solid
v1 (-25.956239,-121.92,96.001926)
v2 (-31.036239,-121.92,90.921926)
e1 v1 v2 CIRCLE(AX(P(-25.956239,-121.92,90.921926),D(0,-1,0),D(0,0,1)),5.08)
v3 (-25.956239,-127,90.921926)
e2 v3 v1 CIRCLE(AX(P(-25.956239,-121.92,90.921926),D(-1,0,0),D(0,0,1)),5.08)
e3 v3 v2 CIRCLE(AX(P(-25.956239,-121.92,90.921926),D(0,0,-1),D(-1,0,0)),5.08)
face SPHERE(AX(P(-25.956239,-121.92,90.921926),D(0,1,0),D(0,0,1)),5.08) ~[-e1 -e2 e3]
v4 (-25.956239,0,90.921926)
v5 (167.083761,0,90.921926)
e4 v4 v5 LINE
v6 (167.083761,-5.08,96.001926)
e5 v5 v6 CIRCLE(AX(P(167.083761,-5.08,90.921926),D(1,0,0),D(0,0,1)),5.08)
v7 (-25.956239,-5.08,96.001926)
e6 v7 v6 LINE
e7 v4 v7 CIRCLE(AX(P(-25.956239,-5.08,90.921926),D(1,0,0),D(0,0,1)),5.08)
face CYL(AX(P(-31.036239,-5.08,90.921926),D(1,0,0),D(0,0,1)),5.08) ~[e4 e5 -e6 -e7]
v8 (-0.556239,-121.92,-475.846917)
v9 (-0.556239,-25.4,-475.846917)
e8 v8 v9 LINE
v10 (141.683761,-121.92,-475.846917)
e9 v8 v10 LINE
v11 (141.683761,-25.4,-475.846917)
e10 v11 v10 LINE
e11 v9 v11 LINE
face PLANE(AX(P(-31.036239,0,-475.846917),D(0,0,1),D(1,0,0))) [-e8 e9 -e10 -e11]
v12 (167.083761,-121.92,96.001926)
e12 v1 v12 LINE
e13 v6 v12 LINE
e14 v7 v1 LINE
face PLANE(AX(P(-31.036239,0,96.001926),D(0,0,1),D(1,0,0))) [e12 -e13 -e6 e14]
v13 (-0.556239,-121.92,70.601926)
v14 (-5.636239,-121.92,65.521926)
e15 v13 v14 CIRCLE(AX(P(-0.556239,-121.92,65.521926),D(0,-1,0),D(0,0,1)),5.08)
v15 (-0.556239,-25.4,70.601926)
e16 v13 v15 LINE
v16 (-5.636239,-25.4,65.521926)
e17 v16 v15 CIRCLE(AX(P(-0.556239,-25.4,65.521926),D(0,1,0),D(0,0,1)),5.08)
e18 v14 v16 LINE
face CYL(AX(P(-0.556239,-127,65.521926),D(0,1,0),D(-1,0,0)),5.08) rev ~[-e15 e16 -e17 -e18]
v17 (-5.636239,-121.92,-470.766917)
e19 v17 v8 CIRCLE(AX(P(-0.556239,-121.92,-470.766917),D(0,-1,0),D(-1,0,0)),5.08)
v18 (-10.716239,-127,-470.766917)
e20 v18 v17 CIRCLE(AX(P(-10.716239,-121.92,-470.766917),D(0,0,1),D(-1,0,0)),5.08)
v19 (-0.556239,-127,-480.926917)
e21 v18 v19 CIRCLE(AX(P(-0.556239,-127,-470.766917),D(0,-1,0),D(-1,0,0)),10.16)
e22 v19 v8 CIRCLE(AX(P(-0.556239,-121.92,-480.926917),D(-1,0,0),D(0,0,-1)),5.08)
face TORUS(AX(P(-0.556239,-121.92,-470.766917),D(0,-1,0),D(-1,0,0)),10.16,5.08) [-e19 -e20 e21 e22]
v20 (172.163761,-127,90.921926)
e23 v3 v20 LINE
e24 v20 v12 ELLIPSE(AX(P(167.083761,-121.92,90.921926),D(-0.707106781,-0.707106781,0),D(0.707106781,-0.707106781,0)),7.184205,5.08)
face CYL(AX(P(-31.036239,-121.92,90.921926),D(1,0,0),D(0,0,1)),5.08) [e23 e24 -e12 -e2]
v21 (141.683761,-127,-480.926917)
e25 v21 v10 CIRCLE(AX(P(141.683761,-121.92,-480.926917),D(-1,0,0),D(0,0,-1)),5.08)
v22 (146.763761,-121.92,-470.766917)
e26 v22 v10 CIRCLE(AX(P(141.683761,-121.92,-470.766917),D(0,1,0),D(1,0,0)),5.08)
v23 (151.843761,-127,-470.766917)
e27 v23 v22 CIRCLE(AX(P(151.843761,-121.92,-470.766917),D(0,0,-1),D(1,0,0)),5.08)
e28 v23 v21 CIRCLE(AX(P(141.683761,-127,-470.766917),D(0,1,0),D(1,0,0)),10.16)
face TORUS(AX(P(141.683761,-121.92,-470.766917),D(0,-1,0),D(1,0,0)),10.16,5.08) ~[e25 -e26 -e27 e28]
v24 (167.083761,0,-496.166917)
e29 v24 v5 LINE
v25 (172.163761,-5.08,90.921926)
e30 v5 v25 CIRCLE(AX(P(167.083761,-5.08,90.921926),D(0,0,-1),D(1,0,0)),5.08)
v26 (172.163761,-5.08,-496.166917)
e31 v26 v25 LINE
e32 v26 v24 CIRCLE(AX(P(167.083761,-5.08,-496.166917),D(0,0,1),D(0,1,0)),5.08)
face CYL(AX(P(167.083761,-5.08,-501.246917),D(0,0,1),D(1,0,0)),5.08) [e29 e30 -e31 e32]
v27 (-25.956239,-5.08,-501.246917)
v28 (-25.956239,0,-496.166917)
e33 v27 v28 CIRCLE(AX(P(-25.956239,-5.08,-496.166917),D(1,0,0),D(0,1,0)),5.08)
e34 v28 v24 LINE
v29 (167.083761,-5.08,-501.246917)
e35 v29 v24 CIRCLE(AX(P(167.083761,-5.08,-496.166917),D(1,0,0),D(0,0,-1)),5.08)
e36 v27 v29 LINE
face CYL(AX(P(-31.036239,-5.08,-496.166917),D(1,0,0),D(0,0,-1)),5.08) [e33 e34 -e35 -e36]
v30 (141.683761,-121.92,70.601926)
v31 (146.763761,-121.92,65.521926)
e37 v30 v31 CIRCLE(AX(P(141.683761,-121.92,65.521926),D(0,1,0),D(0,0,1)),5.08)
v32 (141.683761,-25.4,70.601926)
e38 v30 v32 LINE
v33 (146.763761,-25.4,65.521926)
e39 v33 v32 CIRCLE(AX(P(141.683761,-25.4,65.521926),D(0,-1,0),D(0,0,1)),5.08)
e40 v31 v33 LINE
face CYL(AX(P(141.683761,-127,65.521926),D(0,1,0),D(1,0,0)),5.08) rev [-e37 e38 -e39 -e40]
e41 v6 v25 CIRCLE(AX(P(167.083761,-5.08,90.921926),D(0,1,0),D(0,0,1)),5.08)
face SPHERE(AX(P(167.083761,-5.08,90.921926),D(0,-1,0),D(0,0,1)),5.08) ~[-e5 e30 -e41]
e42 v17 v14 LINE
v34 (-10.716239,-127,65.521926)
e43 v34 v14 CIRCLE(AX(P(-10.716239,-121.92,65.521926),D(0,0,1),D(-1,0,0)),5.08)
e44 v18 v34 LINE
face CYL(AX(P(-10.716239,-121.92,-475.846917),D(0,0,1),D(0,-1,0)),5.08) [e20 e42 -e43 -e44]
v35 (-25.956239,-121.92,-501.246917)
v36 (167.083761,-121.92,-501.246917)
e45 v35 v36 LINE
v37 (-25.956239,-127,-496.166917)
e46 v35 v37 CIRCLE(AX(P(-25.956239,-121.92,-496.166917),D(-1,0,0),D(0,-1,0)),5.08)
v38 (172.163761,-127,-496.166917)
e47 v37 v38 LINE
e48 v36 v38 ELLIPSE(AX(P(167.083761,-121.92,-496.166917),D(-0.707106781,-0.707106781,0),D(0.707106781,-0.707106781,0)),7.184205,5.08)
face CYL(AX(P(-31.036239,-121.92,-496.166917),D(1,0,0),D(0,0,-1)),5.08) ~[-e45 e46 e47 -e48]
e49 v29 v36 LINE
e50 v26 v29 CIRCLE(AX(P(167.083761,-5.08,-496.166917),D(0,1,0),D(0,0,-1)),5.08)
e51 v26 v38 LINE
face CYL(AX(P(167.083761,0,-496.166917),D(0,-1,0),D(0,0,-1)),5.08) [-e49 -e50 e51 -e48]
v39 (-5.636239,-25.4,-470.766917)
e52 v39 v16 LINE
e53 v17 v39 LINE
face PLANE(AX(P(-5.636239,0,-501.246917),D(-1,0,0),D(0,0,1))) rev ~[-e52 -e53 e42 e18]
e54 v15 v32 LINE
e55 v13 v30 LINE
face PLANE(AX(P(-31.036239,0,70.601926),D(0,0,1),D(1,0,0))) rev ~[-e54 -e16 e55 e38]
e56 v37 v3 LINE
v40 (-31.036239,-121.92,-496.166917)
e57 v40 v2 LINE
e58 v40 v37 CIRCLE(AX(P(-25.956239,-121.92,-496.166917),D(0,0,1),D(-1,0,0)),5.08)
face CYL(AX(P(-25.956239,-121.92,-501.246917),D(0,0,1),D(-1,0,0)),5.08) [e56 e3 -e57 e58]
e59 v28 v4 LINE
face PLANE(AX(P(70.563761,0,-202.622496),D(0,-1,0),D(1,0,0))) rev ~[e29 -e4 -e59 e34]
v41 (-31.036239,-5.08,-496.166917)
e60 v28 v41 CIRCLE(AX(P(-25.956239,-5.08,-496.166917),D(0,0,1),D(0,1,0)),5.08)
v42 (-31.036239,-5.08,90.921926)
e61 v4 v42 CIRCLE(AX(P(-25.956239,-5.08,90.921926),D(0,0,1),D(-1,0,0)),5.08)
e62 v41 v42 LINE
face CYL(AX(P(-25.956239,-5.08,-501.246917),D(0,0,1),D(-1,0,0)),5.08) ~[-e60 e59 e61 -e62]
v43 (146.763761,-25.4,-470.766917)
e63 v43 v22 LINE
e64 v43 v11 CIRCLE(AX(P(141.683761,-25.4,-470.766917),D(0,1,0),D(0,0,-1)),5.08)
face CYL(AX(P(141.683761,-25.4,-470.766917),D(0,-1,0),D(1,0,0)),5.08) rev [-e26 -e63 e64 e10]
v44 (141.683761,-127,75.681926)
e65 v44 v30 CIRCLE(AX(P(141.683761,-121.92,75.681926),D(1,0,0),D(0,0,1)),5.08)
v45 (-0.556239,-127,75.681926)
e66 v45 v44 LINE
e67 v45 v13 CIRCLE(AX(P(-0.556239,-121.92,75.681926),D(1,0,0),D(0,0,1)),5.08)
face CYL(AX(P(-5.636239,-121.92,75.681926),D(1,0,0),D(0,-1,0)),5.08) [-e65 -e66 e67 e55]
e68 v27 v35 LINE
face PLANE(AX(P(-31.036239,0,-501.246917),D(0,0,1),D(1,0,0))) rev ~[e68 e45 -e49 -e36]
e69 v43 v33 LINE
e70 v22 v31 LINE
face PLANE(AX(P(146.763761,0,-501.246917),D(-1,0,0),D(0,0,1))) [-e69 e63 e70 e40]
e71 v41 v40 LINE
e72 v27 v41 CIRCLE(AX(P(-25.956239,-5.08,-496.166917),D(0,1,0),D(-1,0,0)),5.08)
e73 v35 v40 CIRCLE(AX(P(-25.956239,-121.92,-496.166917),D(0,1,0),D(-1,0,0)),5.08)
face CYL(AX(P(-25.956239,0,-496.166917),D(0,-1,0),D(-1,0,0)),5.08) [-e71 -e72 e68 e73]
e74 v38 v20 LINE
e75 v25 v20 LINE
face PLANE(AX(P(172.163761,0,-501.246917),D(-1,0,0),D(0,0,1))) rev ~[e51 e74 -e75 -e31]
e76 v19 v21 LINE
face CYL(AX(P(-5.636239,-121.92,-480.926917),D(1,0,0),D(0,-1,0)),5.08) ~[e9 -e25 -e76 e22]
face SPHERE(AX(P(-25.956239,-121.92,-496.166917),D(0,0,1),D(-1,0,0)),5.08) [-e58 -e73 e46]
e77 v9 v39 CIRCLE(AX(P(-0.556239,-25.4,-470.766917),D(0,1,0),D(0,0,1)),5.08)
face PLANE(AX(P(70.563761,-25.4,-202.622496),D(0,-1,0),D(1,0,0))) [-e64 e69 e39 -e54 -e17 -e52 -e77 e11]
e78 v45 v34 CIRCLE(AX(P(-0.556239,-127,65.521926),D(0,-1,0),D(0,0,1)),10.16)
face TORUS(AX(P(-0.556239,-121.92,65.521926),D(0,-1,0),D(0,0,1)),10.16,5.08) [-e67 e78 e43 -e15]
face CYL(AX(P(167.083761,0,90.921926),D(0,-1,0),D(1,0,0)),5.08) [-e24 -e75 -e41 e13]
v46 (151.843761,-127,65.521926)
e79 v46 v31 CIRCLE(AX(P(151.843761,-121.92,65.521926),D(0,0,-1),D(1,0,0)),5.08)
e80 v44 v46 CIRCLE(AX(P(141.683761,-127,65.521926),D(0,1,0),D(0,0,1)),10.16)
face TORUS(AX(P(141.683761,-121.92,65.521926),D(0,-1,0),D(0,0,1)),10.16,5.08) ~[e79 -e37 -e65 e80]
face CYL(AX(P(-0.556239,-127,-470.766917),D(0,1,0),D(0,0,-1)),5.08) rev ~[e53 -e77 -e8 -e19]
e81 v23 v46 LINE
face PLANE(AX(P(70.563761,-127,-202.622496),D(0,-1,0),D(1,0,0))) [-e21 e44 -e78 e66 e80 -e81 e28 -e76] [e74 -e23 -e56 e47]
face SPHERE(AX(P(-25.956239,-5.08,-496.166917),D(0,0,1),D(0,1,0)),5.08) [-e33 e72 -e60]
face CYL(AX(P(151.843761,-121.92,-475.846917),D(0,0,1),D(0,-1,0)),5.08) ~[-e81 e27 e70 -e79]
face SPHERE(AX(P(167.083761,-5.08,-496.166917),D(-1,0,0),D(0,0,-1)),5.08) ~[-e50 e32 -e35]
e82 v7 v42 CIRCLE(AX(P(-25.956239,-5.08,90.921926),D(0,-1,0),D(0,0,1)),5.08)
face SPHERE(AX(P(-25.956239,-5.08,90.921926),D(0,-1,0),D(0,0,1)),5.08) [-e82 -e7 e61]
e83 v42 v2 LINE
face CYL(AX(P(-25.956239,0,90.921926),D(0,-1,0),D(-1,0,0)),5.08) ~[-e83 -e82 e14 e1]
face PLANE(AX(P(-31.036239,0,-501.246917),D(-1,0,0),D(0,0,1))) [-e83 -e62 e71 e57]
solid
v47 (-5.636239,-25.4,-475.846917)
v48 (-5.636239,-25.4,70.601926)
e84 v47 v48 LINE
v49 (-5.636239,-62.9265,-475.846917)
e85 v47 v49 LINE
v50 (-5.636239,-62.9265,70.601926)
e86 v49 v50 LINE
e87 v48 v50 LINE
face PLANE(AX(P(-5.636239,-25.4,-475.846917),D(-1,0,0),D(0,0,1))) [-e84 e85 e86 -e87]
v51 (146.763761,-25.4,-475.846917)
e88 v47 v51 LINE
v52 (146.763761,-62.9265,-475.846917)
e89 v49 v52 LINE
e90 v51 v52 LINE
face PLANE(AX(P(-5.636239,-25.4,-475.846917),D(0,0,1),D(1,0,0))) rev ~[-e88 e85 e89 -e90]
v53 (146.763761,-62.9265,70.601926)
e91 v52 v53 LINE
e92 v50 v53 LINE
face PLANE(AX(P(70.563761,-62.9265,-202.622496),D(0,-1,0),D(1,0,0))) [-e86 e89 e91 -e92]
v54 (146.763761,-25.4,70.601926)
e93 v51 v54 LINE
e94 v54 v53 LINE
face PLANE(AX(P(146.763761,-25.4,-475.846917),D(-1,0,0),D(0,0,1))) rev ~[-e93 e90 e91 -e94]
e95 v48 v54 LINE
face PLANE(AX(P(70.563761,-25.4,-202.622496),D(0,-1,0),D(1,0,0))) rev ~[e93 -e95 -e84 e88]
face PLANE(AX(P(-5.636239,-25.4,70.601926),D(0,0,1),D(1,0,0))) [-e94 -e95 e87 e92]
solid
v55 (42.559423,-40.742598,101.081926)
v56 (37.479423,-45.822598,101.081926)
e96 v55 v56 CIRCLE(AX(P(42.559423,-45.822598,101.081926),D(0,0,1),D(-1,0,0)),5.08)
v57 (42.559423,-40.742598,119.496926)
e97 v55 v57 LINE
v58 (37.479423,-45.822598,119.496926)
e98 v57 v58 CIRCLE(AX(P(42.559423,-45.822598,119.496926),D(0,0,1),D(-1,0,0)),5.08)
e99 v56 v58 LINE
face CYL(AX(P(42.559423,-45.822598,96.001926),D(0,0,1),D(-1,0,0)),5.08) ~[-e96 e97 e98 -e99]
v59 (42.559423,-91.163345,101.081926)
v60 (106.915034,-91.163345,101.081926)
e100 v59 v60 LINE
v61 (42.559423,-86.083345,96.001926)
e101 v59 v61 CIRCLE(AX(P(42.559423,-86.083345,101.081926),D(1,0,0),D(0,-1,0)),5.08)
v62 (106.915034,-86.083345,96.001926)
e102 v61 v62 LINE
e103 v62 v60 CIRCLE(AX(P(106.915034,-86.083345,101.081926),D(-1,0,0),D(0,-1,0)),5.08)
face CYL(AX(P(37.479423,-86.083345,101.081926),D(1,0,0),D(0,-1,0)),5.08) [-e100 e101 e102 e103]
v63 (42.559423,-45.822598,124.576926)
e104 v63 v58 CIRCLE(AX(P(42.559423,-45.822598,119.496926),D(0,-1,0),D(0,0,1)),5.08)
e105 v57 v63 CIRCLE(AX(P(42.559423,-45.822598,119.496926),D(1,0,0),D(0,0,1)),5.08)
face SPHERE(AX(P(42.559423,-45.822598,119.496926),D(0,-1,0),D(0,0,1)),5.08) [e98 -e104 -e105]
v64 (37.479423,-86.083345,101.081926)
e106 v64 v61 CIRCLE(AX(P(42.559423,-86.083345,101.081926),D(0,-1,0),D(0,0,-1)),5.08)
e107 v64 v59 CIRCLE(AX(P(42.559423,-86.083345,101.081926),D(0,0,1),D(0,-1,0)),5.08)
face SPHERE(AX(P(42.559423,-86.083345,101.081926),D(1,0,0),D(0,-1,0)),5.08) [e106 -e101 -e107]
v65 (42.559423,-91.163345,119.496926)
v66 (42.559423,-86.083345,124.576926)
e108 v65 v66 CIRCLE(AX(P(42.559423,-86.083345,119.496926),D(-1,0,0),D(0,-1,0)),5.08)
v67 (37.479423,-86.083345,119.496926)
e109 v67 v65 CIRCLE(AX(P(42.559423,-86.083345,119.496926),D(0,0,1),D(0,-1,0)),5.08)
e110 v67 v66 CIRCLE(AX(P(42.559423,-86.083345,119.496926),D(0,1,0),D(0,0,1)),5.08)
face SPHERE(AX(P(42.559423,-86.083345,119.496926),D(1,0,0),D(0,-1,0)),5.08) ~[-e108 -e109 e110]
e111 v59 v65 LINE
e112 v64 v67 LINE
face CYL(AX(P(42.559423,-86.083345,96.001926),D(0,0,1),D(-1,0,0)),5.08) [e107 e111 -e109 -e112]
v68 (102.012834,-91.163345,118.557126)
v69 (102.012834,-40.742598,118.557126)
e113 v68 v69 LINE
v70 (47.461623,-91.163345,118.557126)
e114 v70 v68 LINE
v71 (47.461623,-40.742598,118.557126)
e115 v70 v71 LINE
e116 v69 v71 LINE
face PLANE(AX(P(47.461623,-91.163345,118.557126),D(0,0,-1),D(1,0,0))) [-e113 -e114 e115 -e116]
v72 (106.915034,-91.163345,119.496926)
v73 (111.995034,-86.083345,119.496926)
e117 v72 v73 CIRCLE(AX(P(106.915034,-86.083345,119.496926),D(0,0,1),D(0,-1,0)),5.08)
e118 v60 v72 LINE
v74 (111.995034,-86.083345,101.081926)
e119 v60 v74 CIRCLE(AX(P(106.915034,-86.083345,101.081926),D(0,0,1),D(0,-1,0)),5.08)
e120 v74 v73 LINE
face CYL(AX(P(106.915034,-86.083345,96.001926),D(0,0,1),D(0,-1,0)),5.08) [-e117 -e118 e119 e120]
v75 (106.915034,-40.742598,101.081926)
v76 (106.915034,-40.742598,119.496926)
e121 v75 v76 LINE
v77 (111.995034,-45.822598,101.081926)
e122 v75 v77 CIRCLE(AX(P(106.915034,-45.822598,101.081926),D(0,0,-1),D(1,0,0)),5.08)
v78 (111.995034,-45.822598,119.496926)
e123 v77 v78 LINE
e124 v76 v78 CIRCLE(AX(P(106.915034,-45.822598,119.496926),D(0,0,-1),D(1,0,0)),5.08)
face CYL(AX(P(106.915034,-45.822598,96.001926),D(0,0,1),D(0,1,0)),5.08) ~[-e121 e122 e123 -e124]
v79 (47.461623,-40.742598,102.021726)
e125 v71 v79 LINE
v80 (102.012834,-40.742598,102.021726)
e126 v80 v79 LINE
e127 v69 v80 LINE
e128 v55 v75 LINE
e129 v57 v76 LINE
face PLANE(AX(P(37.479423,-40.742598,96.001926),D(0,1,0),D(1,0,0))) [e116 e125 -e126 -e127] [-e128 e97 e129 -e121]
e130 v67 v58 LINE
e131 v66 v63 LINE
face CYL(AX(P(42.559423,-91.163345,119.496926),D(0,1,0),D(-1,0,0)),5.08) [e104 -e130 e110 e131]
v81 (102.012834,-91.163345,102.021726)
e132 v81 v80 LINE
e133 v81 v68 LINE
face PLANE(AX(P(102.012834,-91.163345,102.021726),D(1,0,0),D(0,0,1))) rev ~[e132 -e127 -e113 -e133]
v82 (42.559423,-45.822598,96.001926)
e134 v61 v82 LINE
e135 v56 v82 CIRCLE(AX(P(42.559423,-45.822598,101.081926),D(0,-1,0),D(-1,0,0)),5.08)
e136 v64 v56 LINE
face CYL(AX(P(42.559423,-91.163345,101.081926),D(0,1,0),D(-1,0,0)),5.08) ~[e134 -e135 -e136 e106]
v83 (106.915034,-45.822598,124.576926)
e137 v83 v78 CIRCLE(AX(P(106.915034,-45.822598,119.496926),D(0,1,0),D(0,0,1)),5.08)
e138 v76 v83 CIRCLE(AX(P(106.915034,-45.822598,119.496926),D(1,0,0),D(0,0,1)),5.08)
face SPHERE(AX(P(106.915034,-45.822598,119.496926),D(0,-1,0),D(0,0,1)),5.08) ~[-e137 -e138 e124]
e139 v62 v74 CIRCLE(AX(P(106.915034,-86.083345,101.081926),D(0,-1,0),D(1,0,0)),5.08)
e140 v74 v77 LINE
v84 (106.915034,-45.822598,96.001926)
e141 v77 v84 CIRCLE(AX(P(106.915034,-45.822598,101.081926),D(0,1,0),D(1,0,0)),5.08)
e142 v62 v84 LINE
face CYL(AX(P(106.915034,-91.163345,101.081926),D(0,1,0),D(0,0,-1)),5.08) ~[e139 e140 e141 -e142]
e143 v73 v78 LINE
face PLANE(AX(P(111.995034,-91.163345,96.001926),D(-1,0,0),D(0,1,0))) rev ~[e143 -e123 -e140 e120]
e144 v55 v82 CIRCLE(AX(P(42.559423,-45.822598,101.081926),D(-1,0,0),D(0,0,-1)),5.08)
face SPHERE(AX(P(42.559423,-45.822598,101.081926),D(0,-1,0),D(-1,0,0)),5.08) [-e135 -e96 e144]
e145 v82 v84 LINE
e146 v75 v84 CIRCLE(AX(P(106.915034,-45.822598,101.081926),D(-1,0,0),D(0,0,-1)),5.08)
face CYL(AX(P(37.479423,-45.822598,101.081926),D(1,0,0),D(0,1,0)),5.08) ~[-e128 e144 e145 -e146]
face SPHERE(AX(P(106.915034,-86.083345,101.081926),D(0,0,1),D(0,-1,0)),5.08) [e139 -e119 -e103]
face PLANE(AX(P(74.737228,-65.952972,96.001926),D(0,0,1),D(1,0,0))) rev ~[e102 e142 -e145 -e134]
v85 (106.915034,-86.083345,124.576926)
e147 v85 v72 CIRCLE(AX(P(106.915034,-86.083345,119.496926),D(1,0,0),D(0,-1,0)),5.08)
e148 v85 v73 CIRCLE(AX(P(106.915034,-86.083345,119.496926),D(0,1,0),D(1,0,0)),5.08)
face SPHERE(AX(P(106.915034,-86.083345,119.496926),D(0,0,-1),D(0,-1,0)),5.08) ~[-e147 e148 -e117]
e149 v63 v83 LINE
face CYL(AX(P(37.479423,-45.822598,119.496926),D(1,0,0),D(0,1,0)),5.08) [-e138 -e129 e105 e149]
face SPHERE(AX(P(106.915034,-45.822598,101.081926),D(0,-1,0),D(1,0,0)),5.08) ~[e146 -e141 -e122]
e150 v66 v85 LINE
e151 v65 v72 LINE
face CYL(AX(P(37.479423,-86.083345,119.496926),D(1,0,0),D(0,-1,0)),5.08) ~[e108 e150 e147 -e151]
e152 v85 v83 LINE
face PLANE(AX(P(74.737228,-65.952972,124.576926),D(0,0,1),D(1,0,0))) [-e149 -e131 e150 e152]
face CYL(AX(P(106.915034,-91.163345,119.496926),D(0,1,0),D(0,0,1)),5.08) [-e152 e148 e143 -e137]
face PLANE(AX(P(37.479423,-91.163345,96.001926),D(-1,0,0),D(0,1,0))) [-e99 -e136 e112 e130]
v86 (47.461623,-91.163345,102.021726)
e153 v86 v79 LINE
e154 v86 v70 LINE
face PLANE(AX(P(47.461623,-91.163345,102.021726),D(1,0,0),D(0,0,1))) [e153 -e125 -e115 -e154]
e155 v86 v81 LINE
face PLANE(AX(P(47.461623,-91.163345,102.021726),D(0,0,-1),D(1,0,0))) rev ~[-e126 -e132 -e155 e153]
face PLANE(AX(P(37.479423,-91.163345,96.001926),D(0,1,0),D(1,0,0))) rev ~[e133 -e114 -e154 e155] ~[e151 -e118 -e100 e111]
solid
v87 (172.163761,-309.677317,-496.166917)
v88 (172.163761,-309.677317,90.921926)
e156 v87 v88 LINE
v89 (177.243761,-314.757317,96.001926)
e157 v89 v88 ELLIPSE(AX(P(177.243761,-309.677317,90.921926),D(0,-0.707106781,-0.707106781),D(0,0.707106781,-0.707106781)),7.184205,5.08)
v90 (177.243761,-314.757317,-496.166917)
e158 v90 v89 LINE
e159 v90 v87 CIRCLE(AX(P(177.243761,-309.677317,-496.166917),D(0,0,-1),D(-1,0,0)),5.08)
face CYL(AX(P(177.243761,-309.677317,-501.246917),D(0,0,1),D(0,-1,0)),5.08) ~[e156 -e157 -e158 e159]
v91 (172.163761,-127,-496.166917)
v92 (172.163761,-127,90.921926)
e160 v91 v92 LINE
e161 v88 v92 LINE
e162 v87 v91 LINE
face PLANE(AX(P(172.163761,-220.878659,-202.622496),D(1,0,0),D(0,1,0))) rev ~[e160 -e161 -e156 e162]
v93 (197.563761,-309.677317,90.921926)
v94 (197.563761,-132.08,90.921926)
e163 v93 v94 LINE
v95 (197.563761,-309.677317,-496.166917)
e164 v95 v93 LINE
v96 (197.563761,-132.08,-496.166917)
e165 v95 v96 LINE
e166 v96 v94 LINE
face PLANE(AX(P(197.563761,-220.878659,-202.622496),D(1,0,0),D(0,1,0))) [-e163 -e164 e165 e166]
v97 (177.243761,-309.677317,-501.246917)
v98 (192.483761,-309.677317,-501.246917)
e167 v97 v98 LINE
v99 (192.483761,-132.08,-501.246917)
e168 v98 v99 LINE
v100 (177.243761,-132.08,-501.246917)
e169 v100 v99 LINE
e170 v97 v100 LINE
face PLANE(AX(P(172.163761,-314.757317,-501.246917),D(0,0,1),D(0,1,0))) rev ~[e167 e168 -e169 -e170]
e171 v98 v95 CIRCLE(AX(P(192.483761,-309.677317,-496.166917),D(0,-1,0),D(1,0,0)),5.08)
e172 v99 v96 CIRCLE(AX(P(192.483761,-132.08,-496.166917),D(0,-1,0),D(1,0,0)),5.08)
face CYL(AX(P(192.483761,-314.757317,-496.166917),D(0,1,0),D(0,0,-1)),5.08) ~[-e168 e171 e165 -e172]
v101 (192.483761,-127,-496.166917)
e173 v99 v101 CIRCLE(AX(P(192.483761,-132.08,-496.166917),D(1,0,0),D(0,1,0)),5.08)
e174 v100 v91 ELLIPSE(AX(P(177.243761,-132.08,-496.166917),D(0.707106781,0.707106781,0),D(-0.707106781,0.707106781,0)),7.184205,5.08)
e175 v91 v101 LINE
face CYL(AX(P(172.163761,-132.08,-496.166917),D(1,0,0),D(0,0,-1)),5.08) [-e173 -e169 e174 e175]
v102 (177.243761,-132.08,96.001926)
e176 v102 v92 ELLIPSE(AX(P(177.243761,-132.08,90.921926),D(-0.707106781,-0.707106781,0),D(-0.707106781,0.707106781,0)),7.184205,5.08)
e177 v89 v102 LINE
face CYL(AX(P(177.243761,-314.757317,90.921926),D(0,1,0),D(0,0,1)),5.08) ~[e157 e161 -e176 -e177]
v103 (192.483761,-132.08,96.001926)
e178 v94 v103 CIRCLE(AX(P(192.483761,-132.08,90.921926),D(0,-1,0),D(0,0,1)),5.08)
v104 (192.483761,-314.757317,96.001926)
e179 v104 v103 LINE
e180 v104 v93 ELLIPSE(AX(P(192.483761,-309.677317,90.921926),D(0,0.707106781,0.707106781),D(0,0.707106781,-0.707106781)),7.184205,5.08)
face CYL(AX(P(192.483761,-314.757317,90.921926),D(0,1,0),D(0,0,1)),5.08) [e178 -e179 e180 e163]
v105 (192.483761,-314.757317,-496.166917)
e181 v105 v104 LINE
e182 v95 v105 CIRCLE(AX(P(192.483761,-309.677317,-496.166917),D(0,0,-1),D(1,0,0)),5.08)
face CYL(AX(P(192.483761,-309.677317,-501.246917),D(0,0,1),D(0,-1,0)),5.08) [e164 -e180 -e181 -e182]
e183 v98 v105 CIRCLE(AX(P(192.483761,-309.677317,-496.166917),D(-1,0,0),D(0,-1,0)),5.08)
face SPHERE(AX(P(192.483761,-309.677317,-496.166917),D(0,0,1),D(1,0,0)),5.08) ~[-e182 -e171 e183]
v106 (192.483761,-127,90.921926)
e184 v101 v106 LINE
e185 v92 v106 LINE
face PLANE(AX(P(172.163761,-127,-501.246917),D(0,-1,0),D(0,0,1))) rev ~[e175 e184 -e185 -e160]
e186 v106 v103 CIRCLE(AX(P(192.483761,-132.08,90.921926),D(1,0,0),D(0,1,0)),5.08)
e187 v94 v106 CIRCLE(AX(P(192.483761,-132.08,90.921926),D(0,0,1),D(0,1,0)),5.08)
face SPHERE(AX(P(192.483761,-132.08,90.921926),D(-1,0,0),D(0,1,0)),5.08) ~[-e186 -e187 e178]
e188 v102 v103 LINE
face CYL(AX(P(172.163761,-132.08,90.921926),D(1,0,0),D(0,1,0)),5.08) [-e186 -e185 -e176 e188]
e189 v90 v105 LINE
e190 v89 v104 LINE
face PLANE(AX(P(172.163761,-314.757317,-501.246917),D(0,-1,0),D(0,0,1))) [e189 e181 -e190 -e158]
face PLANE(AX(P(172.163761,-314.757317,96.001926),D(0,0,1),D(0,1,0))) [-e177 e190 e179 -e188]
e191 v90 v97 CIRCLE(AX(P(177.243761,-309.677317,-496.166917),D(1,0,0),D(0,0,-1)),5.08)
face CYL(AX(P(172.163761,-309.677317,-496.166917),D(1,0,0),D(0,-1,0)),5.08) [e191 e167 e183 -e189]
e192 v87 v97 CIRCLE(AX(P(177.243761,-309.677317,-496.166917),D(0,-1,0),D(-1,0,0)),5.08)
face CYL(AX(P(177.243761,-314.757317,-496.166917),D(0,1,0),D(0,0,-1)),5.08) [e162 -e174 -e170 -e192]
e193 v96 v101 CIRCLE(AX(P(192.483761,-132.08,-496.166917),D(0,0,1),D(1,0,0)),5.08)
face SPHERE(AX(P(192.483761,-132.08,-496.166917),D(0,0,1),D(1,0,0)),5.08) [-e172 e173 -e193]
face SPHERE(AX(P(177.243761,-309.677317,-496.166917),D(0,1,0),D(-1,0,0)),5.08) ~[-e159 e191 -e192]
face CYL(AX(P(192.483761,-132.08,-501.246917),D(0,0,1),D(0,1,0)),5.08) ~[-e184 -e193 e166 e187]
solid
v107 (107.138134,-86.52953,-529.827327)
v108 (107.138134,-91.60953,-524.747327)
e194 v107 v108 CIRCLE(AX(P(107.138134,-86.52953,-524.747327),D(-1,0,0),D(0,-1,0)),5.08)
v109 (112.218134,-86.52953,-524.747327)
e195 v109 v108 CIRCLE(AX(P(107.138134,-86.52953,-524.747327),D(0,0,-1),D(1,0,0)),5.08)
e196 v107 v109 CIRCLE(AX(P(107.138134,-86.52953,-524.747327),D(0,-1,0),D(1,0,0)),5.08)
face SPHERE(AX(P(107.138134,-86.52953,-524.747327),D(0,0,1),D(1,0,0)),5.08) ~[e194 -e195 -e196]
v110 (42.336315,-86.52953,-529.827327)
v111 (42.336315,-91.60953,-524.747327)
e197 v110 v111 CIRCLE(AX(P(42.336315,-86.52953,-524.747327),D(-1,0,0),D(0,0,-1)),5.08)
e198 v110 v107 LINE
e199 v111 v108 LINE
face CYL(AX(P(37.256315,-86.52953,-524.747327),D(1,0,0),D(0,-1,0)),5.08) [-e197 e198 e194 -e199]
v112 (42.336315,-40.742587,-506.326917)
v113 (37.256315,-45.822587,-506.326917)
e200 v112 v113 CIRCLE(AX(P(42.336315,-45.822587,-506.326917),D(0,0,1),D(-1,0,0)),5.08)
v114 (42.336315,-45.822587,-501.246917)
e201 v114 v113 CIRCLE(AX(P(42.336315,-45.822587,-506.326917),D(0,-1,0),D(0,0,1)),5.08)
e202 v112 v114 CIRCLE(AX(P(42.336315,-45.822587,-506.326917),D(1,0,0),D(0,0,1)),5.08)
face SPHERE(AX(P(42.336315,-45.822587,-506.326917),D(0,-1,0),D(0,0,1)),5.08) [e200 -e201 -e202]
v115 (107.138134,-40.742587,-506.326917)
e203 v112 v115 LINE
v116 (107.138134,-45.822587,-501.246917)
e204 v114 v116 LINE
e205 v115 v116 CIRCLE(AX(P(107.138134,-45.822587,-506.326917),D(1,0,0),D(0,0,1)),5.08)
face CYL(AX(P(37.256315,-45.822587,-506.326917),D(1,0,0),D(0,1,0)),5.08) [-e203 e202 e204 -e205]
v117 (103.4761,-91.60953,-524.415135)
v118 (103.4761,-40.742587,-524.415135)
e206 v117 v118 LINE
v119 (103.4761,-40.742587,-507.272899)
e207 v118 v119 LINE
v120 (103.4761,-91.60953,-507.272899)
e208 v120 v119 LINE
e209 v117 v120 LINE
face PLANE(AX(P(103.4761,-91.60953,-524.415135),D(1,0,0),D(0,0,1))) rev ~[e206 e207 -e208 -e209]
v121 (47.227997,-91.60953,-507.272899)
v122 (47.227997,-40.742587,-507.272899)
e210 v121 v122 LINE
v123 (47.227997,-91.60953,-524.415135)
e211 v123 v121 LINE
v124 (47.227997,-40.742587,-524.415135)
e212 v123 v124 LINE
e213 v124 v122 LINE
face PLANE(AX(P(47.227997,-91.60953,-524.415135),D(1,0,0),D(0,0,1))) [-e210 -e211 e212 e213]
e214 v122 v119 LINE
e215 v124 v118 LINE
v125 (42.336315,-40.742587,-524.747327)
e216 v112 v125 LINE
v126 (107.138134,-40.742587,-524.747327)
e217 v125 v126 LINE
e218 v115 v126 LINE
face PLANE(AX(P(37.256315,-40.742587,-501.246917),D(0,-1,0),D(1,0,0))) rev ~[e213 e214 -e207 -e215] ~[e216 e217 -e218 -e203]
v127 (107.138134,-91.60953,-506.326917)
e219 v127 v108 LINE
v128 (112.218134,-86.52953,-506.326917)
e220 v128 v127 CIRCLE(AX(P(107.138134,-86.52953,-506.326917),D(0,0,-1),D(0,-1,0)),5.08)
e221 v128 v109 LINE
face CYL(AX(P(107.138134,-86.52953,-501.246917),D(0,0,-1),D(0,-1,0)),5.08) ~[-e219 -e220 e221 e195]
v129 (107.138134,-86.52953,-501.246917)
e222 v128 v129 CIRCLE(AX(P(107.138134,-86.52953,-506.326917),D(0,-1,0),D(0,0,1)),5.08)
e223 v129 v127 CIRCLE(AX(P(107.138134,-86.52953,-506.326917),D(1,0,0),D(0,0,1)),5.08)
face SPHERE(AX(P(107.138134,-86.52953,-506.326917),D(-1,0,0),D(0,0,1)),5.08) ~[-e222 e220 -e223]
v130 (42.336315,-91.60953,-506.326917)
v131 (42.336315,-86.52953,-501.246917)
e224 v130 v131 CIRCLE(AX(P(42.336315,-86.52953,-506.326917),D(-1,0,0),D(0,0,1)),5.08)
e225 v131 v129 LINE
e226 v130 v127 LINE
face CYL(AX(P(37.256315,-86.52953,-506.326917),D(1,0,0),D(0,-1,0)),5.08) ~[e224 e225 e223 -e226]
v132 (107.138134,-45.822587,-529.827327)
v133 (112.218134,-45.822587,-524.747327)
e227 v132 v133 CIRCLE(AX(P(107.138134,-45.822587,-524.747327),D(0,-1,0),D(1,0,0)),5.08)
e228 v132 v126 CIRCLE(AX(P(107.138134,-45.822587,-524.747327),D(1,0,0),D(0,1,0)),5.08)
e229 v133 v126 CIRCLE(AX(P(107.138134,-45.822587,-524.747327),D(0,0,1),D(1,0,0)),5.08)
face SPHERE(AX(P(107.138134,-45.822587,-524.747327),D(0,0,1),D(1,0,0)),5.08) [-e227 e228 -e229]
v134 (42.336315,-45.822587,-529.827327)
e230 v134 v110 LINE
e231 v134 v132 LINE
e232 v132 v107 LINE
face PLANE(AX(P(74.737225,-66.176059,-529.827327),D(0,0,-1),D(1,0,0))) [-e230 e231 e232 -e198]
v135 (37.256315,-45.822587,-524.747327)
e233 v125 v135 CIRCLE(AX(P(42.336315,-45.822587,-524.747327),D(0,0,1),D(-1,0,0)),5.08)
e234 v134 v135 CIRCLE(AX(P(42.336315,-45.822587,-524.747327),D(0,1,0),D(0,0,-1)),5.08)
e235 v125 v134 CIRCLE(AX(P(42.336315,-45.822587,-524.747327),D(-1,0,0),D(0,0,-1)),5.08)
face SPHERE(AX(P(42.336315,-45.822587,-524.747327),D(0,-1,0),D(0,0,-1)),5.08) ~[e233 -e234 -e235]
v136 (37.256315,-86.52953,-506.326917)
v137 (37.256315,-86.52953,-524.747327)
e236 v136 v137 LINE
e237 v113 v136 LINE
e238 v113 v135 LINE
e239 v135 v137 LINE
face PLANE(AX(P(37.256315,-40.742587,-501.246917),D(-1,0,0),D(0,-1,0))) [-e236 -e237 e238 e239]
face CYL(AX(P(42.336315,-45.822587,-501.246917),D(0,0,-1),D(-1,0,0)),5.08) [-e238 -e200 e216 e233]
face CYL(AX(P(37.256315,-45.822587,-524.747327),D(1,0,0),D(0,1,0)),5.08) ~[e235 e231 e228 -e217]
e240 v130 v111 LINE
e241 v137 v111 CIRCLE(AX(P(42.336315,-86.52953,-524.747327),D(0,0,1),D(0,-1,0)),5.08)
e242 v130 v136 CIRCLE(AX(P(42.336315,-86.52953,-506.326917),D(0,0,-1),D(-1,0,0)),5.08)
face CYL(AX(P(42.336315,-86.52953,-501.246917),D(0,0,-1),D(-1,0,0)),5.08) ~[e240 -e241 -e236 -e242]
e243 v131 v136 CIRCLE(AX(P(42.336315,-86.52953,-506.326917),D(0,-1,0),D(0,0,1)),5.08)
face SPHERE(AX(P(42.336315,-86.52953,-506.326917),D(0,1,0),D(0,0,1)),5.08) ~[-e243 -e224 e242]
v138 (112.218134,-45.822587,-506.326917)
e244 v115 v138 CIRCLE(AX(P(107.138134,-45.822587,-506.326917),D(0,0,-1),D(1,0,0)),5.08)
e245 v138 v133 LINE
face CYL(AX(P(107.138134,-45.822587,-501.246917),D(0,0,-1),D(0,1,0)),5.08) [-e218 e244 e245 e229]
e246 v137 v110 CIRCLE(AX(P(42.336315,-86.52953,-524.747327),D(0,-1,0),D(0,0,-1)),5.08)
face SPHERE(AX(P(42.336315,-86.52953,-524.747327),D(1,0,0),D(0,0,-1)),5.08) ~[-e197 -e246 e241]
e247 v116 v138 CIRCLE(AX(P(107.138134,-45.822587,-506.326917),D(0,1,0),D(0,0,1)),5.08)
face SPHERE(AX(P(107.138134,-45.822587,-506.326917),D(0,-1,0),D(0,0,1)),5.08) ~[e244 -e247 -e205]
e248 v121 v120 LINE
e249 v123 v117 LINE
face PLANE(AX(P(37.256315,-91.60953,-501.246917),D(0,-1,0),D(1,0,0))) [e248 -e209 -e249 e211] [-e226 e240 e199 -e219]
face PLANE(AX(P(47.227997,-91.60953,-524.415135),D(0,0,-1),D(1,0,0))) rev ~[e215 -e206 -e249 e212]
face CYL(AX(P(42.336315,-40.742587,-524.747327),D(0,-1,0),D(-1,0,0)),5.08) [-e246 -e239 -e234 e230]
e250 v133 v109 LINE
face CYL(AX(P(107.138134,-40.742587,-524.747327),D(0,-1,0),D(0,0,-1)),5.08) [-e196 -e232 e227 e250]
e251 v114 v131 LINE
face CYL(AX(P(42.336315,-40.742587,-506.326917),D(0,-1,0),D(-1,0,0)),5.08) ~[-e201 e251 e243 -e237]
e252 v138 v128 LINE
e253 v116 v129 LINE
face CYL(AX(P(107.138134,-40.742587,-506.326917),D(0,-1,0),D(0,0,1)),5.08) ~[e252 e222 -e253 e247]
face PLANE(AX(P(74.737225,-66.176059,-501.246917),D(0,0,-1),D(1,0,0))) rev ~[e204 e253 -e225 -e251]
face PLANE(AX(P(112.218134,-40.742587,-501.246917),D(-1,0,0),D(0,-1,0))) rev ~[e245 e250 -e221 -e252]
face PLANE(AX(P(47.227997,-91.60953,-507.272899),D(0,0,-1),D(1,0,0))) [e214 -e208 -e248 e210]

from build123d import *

# Parameters (mm, degrees)
F0_W      = 203.2
F0_H      = 597.2488436915
F1_DEPTH  = 127
F2_T      = -25.4
F3_W      = 152.4
F3_H      = 546.4488436915
F4_DEPTH  = 37.5265
F5_W      = 187.7573173046
F5_H      = 597.2488436915
F6_DEPTH  = 25.4
F7_W      = 74.9618187547
F7_H      = 50.8669428527
F8_DEPTH  = 28.58041
F9_W      = 56.2481023371
F9_H      = 17.1422362328
F10_DEPTH = 76.2
F11_W     = 74.5156109333
F11_H     = 50.4207462072
F12_DEPTH = 28.575
F13_W     = 54.5512109333
F13_H     = 16.5354
F14_DEPTH = 76.2
F15_R     = 5.08
F16_R     = 5.08
F17_R     = 5.08
F17_2_R   = 5.08
F18_R     = 5.08


with BuildPart() as f1:
    # F0 (on Front) → F1 (new body)
    with BuildSketch(Plane.XZ):
        with Locations((70.5637605861, -202.6224955916)):
            Rectangle(F0_W, F0_H)
    extrude(amount=F1_DEPTH)

    # F2
    f2_openings = [f1.faces().sort_by_distance(p)[0] for p in [
        (70.563761, -127, -202.622496),
    ]]
    offset(amount=F2_T, openings=f2_openings)

    # F17
    f17_edges = [f1.edges().sort_by_distance(p)[0] for p in [
        (-31.036239, -63.5, 96.001926),
        (172.163761, -63.5, 96.001926),
        (70.563761, -127, 96.001926),
        (70.563761, 0, 96.001926),
        (-31.036239, 0, -202.622496),
        (-31.036239, -127, -202.622496),
        (70.563761, 0, -501.246917),
        (-31.036239, -63.5, -501.246917),
        (172.163761, -63.5, -501.246917),
        (70.563761, -127, -501.246917),
        (172.163761, 0, -202.622496),
    ]]
    fillet(f17_edges, radius=F17_R)

    # F18
    f18_edges = [f1.edges().sort_by_distance(p)[0] for p in [
        (70.563761, -127, 70.601926),
        (146.763761, -127, -202.622496),
        (-5.636239, -127, -202.622496),
        (70.563761, -127, -475.846917),
        (146.763761, -76.2, -475.846917),
        (-5.636239, -76.2, -475.846917),
        (-5.636239, -76.2, 70.601926),
        (146.763761, -76.2, 70.601926),
    ]]
    fillet(f18_edges, radius=F18_R)


with BuildPart() as f4:
    # F3 (on face) → F4 (new body)
    with BuildSketch(Plane.XZ.offset(25.4)):
        with Locations((70.5637605861, -202.6224955916)):
            Rectangle(F3_W, F3_H)
    extrude(amount=F4_DEPTH)


with BuildPart() as f6:
    # F5 (on face) → F6 (new body)
    with BuildSketch(Plane.YZ.offset(172.1637605861)):
        with Locations((-220.8786586523, -202.6224955916)):
            Rectangle(F5_W, F5_H)
    extrude(amount=F6_DEPTH)

    # F17#2
    f17_2_edges = [f6.edges().sort_by_distance(p)[0] for p in [
        (172.163761, -220.878659, -501.246917),
        (172.163761, -220.878659, 96.001926),
        (172.163761, -314.757317, -202.622496),
        (184.863761, -127, 96.001926),
        (197.563761, -127, -202.622496),
        (197.563761, -220.878659, 96.001926),
        (197.563761, -314.757317, -202.622496),
        (197.563761, -220.878659, -501.246917),
        (184.863761, -314.757317, -501.246917),
        (184.863761, -127, -501.246917),
    ]]
    fillet(f17_2_edges, radius=F17_2_R)


with BuildPart() as f8:
    # F7 (on face) → F8 (new body)
    with BuildSketch(Plane(origin=(0, 0, -501.2469174374), x_dir=(1, 0, 0), z_dir=(0, 0, -1))):
        with Locations((74.7372247279, 66.1760587245)):
            Rectangle(F7_W, F7_H)
    extrude(amount=F8_DEPTH)

    # F9 (on face) → F10 (cut)
    with BuildSketch(Plane.XZ.offset(91.6095301509)):
        with Locations((75.3520485014, -515.8440172672)):
            Rectangle(F9_W, F9_H)
    extrude(amount=-F10_DEPTH, mode=Mode.SUBTRACT)

    # F15
    f15_edges = [f8.edges().sort_by_distance(p)[0] for p in [
        (37.256315, -66.176059, -501.246917),
        (74.737225, -91.60953, -501.246917),
        (112.218134, -66.176059, -501.246917),
        (74.737225, -40.742587, -501.246917),
        (112.218134, -40.742587, -515.537122),
        (112.218134, -91.60953, -515.537122),
        (112.218134, -66.176059, -529.827327),
        (74.737225, -91.60953, -529.827327),
        (37.256315, -66.176059, -529.827327),
        (37.256315, -91.60953, -515.537122),
        (74.737225, -40.742587, -529.827327),
        (37.256315, -40.742587, -515.537122),
    ]]
    fillet(f15_edges, radius=F15_R)


with BuildPart() as f12:
    # F11 (on face) → F12 (new body)
    with BuildSketch(Plane.XY.offset(96.0019262541)):
        with Locations((74.7372284532, -65.9529715776)):
            Rectangle(F11_W, F11_H)
    extrude(amount=F12_DEPTH)

    # F13 (on face) → F14 (cut)
    with BuildSketch(Plane.XZ.offset(91.1633446813)):
        with Locations((74.7372284532, 110.2894262541)):
            Rectangle(F13_W, F13_H)
    extrude(amount=-F14_DEPTH, mode=Mode.SUBTRACT)

    # F16
    f16_edges = [f12.edges().sort_by_distance(p)[0] for p in [
        (111.995034, -91.163345, 110.289426),
        (74.737228, -91.163345, 96.001926),
        (74.737228, -91.163345, 124.576926),
        (37.479423, -91.163345, 110.289426),
        (37.479423, -65.952972, 96.001926),
        (37.479423, -65.952972, 124.576926),
        (111.995034, -65.952972, 124.576926),
        (74.737228, -40.742598, 124.576926),
        (111.995034, -65.952972, 96.001926),
        (111.995034, -40.742598, 110.289426),
        (37.479423, -40.742598, 110.289426),
        (74.737228, -40.742598, 96.001926),
    ]]
    fillet(f16_edges, radius=F16_R)


solid = Compound([f1.part, f4.part, f6.part, f8.part, f12.part])
